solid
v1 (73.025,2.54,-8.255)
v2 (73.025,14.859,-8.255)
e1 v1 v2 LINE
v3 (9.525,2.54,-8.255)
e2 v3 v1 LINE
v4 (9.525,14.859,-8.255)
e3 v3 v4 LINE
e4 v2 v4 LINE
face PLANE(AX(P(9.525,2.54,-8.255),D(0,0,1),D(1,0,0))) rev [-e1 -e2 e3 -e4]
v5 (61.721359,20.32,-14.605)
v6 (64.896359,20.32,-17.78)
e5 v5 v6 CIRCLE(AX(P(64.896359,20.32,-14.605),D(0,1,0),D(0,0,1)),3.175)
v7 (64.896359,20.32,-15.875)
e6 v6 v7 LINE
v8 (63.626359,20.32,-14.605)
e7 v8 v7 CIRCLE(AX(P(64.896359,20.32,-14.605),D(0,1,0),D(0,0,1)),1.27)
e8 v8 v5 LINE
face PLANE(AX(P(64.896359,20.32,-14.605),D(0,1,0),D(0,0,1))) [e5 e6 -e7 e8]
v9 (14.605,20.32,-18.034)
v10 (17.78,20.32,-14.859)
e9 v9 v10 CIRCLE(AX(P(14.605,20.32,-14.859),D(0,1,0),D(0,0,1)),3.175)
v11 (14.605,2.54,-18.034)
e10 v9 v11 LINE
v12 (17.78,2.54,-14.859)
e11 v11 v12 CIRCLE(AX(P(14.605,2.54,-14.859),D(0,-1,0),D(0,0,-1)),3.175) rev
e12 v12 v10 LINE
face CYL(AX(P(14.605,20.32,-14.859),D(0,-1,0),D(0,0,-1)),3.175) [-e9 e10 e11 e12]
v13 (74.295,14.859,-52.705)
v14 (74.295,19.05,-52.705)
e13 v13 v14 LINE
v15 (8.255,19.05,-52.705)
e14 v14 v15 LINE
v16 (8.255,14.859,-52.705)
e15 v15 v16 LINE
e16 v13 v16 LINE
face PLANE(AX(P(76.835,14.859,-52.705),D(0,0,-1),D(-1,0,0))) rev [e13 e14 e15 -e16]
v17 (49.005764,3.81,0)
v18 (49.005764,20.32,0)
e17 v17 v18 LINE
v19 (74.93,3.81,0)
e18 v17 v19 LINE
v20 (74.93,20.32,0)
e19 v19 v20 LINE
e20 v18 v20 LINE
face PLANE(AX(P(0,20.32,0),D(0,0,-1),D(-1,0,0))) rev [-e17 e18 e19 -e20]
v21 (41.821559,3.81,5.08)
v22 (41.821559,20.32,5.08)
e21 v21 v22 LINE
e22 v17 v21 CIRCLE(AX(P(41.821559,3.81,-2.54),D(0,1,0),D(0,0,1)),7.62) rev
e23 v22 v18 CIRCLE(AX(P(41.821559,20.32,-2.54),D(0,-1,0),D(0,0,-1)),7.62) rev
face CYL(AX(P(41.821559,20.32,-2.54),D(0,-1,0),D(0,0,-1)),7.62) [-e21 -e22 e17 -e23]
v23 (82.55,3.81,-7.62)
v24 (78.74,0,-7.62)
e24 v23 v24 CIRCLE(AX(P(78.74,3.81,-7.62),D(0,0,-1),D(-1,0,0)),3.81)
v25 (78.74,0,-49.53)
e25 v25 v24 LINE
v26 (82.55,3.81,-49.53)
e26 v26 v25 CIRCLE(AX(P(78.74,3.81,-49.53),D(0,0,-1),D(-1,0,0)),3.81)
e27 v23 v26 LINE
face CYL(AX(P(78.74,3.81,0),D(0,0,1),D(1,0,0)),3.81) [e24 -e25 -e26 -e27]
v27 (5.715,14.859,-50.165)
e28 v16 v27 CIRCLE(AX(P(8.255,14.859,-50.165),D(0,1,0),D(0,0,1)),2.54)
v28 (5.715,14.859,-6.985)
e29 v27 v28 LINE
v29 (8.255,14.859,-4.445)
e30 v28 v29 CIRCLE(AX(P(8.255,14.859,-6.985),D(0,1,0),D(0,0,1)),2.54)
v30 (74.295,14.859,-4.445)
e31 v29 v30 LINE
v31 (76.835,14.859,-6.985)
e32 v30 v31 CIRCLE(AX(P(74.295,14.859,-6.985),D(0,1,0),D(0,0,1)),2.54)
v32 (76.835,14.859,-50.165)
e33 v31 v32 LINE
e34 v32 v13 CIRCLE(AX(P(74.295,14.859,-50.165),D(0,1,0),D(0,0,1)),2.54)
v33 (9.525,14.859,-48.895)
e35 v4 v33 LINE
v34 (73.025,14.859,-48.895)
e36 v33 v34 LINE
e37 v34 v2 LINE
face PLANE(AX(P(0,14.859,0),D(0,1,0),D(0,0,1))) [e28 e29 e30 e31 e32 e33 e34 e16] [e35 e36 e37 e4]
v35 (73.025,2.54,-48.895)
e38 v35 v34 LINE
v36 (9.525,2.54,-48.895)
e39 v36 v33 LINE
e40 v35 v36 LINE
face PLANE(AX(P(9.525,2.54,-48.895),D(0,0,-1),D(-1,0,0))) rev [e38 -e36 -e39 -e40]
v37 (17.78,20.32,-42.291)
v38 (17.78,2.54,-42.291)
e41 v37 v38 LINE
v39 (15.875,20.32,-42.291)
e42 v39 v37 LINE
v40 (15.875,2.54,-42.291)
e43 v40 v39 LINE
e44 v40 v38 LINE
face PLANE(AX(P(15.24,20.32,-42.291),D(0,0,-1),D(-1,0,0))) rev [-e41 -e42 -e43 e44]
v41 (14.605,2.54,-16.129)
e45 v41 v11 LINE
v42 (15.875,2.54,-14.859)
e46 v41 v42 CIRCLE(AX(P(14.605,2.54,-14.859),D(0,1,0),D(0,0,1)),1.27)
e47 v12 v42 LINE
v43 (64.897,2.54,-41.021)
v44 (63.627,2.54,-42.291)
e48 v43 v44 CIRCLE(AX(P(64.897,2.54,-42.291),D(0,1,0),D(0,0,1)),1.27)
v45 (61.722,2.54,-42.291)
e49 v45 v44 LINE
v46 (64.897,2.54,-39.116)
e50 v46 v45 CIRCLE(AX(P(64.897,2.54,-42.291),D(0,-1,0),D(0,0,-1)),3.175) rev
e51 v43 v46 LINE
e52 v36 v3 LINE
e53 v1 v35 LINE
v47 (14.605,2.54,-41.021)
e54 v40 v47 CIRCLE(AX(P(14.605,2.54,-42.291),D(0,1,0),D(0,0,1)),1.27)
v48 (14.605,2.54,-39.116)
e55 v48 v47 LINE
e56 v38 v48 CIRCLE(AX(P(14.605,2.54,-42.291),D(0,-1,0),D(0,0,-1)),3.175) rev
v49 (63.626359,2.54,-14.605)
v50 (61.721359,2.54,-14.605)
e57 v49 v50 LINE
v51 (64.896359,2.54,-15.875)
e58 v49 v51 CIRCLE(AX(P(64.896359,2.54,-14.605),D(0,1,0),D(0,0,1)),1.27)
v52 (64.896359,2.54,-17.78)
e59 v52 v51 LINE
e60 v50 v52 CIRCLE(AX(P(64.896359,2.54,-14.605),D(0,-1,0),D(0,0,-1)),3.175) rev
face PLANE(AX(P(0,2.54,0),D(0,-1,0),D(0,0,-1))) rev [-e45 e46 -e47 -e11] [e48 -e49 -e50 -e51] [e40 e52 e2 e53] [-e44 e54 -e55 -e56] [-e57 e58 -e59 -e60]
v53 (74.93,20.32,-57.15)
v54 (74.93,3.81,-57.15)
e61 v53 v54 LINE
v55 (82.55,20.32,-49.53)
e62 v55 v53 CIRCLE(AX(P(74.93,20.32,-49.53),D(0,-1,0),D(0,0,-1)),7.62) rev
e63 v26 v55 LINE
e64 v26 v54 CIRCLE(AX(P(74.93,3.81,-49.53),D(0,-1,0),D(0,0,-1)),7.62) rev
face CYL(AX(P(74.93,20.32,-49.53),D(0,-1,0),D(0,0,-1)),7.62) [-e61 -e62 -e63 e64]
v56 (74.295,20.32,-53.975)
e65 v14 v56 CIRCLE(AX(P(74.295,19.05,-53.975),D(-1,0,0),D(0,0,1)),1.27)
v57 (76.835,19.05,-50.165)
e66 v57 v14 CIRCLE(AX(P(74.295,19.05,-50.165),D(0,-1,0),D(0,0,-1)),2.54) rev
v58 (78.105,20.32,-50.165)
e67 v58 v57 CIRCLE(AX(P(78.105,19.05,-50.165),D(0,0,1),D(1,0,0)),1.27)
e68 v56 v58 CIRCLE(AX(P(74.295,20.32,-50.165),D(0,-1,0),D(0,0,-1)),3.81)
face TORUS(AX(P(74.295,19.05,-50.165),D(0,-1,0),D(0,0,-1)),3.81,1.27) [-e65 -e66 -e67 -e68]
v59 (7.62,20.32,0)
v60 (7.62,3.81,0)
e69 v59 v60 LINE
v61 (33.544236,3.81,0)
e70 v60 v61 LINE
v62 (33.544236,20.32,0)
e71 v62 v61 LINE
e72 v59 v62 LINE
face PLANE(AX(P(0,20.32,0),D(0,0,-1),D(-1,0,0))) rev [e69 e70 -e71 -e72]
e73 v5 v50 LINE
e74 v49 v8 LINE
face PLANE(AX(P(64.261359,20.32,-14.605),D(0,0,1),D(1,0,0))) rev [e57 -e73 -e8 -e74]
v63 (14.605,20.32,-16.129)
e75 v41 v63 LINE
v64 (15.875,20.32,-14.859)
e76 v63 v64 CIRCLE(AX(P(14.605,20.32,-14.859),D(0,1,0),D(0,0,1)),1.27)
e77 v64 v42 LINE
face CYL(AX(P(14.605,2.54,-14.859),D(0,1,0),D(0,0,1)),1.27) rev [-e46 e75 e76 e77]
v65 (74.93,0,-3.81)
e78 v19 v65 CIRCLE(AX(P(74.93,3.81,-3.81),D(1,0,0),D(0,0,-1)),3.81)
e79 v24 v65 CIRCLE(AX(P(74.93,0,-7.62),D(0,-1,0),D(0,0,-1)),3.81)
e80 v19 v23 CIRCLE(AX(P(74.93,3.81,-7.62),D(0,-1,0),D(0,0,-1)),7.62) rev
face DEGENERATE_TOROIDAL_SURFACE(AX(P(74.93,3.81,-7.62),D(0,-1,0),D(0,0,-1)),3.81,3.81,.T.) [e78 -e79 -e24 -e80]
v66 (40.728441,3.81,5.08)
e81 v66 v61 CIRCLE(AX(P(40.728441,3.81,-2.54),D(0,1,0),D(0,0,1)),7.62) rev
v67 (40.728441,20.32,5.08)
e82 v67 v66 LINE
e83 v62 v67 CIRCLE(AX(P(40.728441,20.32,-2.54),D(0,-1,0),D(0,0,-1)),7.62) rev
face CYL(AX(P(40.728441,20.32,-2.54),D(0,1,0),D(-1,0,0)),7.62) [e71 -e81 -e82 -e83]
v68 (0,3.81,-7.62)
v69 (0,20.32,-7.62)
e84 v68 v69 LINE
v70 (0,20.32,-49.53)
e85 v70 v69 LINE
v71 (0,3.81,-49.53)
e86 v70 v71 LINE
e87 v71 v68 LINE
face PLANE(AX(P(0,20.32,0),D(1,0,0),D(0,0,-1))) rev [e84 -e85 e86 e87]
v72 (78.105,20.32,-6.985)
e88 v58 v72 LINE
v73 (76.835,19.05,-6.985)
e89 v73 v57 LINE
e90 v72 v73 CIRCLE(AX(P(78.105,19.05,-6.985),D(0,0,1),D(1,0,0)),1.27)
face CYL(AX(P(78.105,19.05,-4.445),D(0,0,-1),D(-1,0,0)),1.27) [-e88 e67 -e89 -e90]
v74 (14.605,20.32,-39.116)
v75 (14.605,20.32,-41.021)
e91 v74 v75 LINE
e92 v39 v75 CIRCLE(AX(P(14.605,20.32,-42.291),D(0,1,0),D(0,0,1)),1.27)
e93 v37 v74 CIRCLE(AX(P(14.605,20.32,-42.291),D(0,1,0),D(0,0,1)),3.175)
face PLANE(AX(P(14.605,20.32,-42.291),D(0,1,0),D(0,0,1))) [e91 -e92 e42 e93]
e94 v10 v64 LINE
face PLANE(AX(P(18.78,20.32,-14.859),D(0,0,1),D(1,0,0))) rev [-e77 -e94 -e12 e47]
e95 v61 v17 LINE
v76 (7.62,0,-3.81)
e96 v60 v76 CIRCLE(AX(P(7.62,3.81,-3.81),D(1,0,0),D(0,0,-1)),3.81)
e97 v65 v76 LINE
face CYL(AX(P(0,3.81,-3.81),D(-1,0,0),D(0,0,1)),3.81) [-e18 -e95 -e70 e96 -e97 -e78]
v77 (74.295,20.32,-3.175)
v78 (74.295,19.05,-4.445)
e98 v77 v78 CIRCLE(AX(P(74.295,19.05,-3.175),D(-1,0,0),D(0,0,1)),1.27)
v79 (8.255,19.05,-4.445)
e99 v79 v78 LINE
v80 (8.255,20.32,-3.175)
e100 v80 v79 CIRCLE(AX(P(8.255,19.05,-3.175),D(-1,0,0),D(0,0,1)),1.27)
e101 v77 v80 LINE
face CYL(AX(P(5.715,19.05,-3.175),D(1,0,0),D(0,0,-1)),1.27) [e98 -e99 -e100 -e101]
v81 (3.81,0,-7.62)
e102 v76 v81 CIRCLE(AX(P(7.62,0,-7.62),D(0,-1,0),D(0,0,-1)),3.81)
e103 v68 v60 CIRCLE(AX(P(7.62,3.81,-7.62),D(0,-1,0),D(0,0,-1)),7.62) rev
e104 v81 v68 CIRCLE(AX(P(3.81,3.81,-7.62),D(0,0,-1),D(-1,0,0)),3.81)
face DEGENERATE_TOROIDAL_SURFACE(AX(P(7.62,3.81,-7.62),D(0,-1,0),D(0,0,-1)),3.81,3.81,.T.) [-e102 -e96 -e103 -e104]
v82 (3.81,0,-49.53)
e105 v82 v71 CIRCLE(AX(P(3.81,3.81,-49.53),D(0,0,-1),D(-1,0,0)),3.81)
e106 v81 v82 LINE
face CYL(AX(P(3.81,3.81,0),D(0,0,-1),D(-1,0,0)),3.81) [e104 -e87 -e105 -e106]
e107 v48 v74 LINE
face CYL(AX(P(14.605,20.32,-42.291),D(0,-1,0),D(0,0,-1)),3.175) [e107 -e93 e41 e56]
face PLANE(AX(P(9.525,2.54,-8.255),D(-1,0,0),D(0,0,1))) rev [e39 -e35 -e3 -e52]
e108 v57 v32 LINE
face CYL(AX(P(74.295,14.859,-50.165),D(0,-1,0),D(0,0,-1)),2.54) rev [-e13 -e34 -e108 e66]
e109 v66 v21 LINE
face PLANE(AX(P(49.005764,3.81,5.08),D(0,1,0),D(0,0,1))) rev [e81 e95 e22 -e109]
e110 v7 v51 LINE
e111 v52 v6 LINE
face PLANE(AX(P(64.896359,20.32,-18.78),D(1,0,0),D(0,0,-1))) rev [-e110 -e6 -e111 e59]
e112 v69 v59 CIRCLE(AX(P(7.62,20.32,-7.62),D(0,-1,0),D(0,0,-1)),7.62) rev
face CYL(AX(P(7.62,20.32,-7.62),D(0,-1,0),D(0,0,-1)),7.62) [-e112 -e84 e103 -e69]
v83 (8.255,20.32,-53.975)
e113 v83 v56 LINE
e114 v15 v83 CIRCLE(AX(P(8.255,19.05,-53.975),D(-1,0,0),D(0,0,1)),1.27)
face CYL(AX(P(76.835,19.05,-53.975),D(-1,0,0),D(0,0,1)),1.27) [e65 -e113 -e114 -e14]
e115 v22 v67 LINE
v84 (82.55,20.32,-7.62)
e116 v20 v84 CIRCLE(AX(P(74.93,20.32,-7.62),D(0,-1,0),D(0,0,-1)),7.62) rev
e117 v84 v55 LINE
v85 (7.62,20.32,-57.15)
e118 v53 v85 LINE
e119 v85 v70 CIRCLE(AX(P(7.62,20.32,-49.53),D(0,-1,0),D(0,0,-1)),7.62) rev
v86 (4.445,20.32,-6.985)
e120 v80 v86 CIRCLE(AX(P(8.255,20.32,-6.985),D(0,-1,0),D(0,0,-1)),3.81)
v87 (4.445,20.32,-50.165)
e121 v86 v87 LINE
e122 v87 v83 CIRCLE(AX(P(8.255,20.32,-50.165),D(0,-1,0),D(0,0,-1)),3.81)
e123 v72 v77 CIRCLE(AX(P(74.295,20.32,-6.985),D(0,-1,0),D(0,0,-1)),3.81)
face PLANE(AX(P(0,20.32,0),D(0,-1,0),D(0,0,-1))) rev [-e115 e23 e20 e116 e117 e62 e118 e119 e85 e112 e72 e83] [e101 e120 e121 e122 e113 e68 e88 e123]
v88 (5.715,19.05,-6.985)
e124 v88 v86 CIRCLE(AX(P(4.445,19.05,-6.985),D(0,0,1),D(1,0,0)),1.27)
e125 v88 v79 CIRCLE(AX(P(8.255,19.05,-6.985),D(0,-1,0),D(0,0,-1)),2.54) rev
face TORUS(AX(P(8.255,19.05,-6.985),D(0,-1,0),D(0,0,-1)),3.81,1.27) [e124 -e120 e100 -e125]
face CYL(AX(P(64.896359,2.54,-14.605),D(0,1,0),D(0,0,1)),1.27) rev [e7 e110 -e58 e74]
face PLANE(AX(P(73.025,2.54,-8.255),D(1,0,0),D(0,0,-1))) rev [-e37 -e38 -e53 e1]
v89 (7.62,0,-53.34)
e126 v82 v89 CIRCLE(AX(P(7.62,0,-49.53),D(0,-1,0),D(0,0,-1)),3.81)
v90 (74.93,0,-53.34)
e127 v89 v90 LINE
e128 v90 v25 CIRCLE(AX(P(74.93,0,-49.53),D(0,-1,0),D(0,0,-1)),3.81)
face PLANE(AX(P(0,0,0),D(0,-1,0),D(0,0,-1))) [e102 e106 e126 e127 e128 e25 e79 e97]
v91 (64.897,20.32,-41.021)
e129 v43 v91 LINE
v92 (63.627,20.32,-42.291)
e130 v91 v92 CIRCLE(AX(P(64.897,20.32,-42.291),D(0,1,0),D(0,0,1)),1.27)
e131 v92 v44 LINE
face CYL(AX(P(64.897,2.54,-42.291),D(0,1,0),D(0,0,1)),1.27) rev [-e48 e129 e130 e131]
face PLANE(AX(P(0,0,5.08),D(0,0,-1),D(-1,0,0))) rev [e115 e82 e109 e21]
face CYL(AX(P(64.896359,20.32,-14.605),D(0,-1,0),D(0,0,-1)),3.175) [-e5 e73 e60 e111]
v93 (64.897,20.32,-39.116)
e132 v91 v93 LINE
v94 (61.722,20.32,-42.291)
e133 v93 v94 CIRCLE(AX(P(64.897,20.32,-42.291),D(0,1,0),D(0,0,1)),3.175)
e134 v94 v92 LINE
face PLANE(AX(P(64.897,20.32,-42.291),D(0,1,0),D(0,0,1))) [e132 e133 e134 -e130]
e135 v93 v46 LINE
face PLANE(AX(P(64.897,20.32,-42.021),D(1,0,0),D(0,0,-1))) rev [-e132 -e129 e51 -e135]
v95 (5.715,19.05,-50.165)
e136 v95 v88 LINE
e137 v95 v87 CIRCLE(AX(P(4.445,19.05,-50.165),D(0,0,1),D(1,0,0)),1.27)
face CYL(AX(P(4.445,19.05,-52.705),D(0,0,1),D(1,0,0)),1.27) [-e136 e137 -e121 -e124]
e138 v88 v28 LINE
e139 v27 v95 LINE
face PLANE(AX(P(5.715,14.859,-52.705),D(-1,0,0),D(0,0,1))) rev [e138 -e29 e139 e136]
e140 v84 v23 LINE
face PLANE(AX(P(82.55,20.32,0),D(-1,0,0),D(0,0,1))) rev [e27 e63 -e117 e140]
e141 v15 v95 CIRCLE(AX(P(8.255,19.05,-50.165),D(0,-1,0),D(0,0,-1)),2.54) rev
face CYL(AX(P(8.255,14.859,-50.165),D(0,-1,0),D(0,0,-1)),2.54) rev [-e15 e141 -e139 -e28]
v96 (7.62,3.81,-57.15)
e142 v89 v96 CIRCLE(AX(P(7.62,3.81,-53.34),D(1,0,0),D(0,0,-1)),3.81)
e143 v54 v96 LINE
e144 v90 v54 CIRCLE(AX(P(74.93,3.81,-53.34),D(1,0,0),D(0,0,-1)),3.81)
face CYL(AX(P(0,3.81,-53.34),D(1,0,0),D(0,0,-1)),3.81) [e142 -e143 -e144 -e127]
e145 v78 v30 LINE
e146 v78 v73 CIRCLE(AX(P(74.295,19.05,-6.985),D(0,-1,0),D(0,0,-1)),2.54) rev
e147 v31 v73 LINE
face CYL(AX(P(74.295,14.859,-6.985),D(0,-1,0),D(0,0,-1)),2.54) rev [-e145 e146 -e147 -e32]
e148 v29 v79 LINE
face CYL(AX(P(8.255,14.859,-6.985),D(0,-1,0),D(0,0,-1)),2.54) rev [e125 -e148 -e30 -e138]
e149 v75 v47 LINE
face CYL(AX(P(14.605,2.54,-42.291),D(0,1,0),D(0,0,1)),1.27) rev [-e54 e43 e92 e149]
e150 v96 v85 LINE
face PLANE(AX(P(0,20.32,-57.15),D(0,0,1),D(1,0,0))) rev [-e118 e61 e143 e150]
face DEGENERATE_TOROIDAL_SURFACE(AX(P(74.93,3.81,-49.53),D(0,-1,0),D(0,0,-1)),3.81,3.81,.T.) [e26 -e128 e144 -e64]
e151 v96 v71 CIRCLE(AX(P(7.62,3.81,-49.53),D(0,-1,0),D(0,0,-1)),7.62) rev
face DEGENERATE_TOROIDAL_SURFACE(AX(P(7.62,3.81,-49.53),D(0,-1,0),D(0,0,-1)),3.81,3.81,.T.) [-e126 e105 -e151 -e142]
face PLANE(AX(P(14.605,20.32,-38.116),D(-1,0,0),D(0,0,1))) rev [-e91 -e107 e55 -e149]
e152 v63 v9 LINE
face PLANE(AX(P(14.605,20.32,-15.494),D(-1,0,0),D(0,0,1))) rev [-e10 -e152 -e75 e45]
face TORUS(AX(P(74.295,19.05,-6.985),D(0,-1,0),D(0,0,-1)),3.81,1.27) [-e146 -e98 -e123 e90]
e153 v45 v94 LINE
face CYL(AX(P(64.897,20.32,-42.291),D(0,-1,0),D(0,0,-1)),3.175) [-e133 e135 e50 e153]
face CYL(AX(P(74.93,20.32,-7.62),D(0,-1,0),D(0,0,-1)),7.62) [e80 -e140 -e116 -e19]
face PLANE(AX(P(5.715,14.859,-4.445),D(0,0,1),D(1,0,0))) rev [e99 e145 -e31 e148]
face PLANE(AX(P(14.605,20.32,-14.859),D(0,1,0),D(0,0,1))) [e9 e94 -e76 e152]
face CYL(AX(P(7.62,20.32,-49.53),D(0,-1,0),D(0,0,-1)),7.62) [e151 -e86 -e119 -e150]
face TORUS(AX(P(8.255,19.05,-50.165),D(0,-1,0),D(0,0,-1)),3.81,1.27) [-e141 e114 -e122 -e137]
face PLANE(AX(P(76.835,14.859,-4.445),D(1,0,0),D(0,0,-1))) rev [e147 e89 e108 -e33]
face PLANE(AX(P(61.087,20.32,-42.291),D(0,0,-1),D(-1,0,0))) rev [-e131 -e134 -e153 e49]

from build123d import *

# Parameters (mm, degrees)
SKETCH1_W               = 82.55
SKETCH1_H               = 57.15
BOSS_EXTRUDE1_DEPTH     = 20.32
FILLET2_R               = 7.62
FILLET3_R               = 3.81
SKETCH2_W               = 63.5
SKETCH2_H               = 40.64
CUT_EXTRUDE1_DEPTH      = 17.78
SKETCH9_W               = 15.46152766
SKETCH9_H               = 16.51
BOSS_EXTRUDE5_DEPTH     = 5.08
FILLET10_R              = 7.62
SKETCH7_W               = 71.12
SKETCH7_H               = 48.26
CUT_EXTRUDE4_DEPTH      = 5.461
FILLET12_R              = 2.54
FILLET13_R              = 1.27
SKETCH5_R               = 3.175
BOSS_EXTRUDE6_DEPTH     = 17.78
SKETCH11_R              = 1.27
CUT_EXTRUDE5_DEPTH      = 17.78
CUT_EXTRUDE_THIN1_DEPTH = 102.964471319


with BuildPart() as part:
    # Sketch1 → Boss-Extrude1 (new body)
    with BuildSketch(Plane(origin=(0, 0, 0), x_dir=(1, 0, 0), z_dir=(0, 1, 0))):
        with Locations((41.275, 28.575)):
            Rectangle(SKETCH1_W, SKETCH1_H)
    extrude(amount=BOSS_EXTRUDE1_DEPTH)

    # Fillet2
    fillet2_edges = [part.edges().sort_by_distance(p)[0] for p in [
        (0, 10.16, -57.15),
        (82.55, 10.16, -57.15),
        (82.55, 10.16, 0),
        (0, 10.16, 0),
    ]]
    fillet(fillet2_edges, radius=FILLET2_R)

    # Fillet3
    fillet3_edges = [part.edges().sort_by_distance(p)[0] for p in [
        (41.275, 0, -57.15),
        (0, 0, -28.575),
        (82.55, 0, -28.575),
        (41.275, 0, 0),
        (2.231846327, 0, -54.918153673),
        (2.231846327, 0, -2.231846327),
        (80.318153673, 0, -2.231846327),
        (80.318153673, 0, -54.918153673),
    ]]
    fillet(fillet3_edges, radius=FILLET3_R)

    # Sketch2 → Cut-Extrude1 (cut)
    with BuildSketch(Plane(origin=(0, 20.32, 0), x_dir=(1, 0, 0), z_dir=(0, 1, 0))):
        with Locations((41.275, 28.575)):
            Rectangle(SKETCH2_W, SKETCH2_H)
    extrude(amount=-CUT_EXTRUDE1_DEPTH, mode=Mode.SUBTRACT)

    # Sketch9 → Boss-Extrude5 (add)
    with BuildSketch(Plane.XY):
        with Locations((41.275, 12.065)):
            Rectangle(SKETCH9_W, SKETCH9_H)
    extrude(amount=BOSS_EXTRUDE5_DEPTH)

    # Fillet10
    # the kernel refuses this fillet: 7.62 mm, written as the material it takes off along each edge
    with BuildSketch(Plane(origin=(49.00576383, -14.150512242, 5.08), x_dir=(-1, 0, 0), z_dir=(0, 1, 0))) as fillet10_piece_1:
        with BuildLine():
            CenterArc((7.184204897, -7.62), FILLET10_R, 90, 70.528779366)
            Line((0, -5.08), (-0.143684098, -5.0292))
            ThreePointArc((-0.143684098, -5.0292), (-0.1524, -2.54), (-0.1524, 0))
            Line((-0.1524, 0), (0, 0.1524))
            Line((0, 0.1524), (7.184204897, 0.1524))
            Line((7.184204897, 0.1524), (7.184204897, 0))
        make_face()
    extrude(amount=52.431024484, mode=Mode.SUBTRACT)
    with BuildSketch(Plane(origin=(33.54423617, 38.280512242, 5.08), x_dir=(0, 0, -1), z_dir=(0, -1, 0))) as fillet10_piece_2:
        with BuildLine():
            CenterArc((7.62, 7.184204897), FILLET10_R, 180, 70.528779366)
            Line((0, 7.184204897), (-0.1524, 7.184204897))
            Line((-0.1524, 7.184204897), (-0.1524, 0))
            Line((-0.1524, 0), (0, -0.1524))
            ThreePointArc((0, -0.1524), (2.54, -0.1524), (5.0292, -0.143684098))
            Line((5.0292, -0.143684098), (5.08, 0))
        make_face()
    extrude(amount=52.431024484, mode=Mode.SUBTRACT)

    # Sketch7 → Cut-Extrude4 (cut)
    with BuildSketch(Plane(origin=(0, 20.32, 0), x_dir=(1, 0, 0), z_dir=(0, 1, 0))):
        with Locations((41.275, 28.575)):
            Rectangle(SKETCH7_W, SKETCH7_H)
    extrude(amount=-CUT_EXTRUDE4_DEPTH, mode=Mode.SUBTRACT)

    # Fillet12
    fillet12_edges = [part.edges().sort_by_distance(p)[0] for p in [
        (5.715, 17.5895, -52.705),
        (76.835, 17.5895, -52.705),
        (76.835, 17.5895, -4.445),
        (5.715, 17.5895, -4.445),
    ]]
    fillet(fillet12_edges, radius=FILLET12_R)

    # Fillet13
    fillet13_edges = [part.edges().sort_by_distance(p)[0] for p in [
        (41.275, 20.32, -52.705),
        (76.835, 20.32, -28.575),
        (41.275, 20.32, -4.445),
        (5.715, 20.32, -28.575),
        (76.091051224, 20.32, -51.961051224),
        (76.091051224, 20.32, -5.188948776),
        (6.458948776, 20.32, -51.961051224),
        (6.458948776, 20.32, -5.188948776),
    ]]
    fillet(fillet13_edges, radius=FILLET13_R)

    # Sketch5 → Boss-Extrude6 (add)
    with BuildSketch(Plane(origin=(0, 2.54, 0), x_dir=(1, 0, 0), z_dir=(0, 1, 0))):
        with Locations(Location((14.605, 42.291, 0), (0, 0, 90))):
            Circle(SKETCH5_R)
        with Locations(Location((14.605, 14.859, 0), (0, 0, 90))):
            Circle(SKETCH5_R)
        with Locations(Location((64.897, 42.291, 0), (0, 0, 90))):
            Circle(SKETCH5_R)
        with Locations(Location((64.896358582, 14.605, 0), (0, 0, 90))):
            Circle(SKETCH5_R)
    extrude(amount=BOSS_EXTRUDE6_DEPTH)

    # Sketch11 → Cut-Extrude5 (cut)
    with BuildSketch(Plane(origin=(0, 20.32, 0), x_dir=(1, 0, 0), z_dir=(0, 1, 0))):
        with Locations(Location((14.605, 14.859, 0), (0, 0, 270))):
            Circle(SKETCH11_R)
        with Locations(Location((14.605, 42.291, 0), (0, 0, 270))):
            Circle(SKETCH11_R)
        with Locations(Location((64.896358582, 14.605, 0), (0, 0, 270))):
            Circle(SKETCH11_R)
        with Locations(Location((64.897, 42.291, 0), (0, 0, 270))):
            Circle(SKETCH11_R)
    extrude(amount=-CUT_EXTRUDE5_DEPTH, mode=Mode.SUBTRACT)

    # Sketch17 → Cut-Extrude-Thin1 (cut, through all)
    with BuildSketch(Plane(origin=(0, 2.54, 0), x_dir=(1, 0, 0), z_dir=(0, 1, 0))):
        with BuildLine():
            ThreePointArc((18.78, 42.291), (17.557170811, 39.338829189), (14.605, 38.116))
            Line((14.605, 38.116), (14.605, 41.656))
            ThreePointArc((14.605, 41.656), (15.054012806, 41.841987194), (15.24, 42.291))
            Line((15.24, 42.291), (18.78, 42.291))
        make_face()
        with BuildLine():
            ThreePointArc((60.721358582, 14.605), (61.94418777, 17.557170811), (64.896358582, 18.78))
            Line((64.896358582, 18.78), (64.896358582, 15.24))
            ThreePointArc((64.896358582, 15.24), (64.447345776, 15.054012806), (64.261358582, 14.605))
            Line((64.261358582, 14.605), (60.721358582, 14.605))
        make_face()
        with BuildLine():
            ThreePointArc((14.605, 19.034), (17.557170811, 17.811170811), (18.78, 14.859))
            Line((18.78, 14.859), (15.24, 14.859))
            ThreePointArc((15.24, 14.859), (15.054012806, 15.308012806), (14.605, 15.494))
            Line((14.605, 15.494), (14.605, 19.034))
        make_face()
        with BuildLine():
            ThreePointArc((64.627, 42.291), (64.706081169, 42.100081169), (64.897, 42.021))
            Line((64.897, 42.021), (64.897, 38.481))
            ThreePointArc((64.897, 38.481), (62.202923164, 39.596923164), (61.087, 42.291))
            Line((61.087, 42.291), (64.627, 42.291))
        make_face()
    extrude(amount=CUT_EXTRUDE_THIN1_DEPTH, mode=Mode.SUBTRACT)


solid = part.part
